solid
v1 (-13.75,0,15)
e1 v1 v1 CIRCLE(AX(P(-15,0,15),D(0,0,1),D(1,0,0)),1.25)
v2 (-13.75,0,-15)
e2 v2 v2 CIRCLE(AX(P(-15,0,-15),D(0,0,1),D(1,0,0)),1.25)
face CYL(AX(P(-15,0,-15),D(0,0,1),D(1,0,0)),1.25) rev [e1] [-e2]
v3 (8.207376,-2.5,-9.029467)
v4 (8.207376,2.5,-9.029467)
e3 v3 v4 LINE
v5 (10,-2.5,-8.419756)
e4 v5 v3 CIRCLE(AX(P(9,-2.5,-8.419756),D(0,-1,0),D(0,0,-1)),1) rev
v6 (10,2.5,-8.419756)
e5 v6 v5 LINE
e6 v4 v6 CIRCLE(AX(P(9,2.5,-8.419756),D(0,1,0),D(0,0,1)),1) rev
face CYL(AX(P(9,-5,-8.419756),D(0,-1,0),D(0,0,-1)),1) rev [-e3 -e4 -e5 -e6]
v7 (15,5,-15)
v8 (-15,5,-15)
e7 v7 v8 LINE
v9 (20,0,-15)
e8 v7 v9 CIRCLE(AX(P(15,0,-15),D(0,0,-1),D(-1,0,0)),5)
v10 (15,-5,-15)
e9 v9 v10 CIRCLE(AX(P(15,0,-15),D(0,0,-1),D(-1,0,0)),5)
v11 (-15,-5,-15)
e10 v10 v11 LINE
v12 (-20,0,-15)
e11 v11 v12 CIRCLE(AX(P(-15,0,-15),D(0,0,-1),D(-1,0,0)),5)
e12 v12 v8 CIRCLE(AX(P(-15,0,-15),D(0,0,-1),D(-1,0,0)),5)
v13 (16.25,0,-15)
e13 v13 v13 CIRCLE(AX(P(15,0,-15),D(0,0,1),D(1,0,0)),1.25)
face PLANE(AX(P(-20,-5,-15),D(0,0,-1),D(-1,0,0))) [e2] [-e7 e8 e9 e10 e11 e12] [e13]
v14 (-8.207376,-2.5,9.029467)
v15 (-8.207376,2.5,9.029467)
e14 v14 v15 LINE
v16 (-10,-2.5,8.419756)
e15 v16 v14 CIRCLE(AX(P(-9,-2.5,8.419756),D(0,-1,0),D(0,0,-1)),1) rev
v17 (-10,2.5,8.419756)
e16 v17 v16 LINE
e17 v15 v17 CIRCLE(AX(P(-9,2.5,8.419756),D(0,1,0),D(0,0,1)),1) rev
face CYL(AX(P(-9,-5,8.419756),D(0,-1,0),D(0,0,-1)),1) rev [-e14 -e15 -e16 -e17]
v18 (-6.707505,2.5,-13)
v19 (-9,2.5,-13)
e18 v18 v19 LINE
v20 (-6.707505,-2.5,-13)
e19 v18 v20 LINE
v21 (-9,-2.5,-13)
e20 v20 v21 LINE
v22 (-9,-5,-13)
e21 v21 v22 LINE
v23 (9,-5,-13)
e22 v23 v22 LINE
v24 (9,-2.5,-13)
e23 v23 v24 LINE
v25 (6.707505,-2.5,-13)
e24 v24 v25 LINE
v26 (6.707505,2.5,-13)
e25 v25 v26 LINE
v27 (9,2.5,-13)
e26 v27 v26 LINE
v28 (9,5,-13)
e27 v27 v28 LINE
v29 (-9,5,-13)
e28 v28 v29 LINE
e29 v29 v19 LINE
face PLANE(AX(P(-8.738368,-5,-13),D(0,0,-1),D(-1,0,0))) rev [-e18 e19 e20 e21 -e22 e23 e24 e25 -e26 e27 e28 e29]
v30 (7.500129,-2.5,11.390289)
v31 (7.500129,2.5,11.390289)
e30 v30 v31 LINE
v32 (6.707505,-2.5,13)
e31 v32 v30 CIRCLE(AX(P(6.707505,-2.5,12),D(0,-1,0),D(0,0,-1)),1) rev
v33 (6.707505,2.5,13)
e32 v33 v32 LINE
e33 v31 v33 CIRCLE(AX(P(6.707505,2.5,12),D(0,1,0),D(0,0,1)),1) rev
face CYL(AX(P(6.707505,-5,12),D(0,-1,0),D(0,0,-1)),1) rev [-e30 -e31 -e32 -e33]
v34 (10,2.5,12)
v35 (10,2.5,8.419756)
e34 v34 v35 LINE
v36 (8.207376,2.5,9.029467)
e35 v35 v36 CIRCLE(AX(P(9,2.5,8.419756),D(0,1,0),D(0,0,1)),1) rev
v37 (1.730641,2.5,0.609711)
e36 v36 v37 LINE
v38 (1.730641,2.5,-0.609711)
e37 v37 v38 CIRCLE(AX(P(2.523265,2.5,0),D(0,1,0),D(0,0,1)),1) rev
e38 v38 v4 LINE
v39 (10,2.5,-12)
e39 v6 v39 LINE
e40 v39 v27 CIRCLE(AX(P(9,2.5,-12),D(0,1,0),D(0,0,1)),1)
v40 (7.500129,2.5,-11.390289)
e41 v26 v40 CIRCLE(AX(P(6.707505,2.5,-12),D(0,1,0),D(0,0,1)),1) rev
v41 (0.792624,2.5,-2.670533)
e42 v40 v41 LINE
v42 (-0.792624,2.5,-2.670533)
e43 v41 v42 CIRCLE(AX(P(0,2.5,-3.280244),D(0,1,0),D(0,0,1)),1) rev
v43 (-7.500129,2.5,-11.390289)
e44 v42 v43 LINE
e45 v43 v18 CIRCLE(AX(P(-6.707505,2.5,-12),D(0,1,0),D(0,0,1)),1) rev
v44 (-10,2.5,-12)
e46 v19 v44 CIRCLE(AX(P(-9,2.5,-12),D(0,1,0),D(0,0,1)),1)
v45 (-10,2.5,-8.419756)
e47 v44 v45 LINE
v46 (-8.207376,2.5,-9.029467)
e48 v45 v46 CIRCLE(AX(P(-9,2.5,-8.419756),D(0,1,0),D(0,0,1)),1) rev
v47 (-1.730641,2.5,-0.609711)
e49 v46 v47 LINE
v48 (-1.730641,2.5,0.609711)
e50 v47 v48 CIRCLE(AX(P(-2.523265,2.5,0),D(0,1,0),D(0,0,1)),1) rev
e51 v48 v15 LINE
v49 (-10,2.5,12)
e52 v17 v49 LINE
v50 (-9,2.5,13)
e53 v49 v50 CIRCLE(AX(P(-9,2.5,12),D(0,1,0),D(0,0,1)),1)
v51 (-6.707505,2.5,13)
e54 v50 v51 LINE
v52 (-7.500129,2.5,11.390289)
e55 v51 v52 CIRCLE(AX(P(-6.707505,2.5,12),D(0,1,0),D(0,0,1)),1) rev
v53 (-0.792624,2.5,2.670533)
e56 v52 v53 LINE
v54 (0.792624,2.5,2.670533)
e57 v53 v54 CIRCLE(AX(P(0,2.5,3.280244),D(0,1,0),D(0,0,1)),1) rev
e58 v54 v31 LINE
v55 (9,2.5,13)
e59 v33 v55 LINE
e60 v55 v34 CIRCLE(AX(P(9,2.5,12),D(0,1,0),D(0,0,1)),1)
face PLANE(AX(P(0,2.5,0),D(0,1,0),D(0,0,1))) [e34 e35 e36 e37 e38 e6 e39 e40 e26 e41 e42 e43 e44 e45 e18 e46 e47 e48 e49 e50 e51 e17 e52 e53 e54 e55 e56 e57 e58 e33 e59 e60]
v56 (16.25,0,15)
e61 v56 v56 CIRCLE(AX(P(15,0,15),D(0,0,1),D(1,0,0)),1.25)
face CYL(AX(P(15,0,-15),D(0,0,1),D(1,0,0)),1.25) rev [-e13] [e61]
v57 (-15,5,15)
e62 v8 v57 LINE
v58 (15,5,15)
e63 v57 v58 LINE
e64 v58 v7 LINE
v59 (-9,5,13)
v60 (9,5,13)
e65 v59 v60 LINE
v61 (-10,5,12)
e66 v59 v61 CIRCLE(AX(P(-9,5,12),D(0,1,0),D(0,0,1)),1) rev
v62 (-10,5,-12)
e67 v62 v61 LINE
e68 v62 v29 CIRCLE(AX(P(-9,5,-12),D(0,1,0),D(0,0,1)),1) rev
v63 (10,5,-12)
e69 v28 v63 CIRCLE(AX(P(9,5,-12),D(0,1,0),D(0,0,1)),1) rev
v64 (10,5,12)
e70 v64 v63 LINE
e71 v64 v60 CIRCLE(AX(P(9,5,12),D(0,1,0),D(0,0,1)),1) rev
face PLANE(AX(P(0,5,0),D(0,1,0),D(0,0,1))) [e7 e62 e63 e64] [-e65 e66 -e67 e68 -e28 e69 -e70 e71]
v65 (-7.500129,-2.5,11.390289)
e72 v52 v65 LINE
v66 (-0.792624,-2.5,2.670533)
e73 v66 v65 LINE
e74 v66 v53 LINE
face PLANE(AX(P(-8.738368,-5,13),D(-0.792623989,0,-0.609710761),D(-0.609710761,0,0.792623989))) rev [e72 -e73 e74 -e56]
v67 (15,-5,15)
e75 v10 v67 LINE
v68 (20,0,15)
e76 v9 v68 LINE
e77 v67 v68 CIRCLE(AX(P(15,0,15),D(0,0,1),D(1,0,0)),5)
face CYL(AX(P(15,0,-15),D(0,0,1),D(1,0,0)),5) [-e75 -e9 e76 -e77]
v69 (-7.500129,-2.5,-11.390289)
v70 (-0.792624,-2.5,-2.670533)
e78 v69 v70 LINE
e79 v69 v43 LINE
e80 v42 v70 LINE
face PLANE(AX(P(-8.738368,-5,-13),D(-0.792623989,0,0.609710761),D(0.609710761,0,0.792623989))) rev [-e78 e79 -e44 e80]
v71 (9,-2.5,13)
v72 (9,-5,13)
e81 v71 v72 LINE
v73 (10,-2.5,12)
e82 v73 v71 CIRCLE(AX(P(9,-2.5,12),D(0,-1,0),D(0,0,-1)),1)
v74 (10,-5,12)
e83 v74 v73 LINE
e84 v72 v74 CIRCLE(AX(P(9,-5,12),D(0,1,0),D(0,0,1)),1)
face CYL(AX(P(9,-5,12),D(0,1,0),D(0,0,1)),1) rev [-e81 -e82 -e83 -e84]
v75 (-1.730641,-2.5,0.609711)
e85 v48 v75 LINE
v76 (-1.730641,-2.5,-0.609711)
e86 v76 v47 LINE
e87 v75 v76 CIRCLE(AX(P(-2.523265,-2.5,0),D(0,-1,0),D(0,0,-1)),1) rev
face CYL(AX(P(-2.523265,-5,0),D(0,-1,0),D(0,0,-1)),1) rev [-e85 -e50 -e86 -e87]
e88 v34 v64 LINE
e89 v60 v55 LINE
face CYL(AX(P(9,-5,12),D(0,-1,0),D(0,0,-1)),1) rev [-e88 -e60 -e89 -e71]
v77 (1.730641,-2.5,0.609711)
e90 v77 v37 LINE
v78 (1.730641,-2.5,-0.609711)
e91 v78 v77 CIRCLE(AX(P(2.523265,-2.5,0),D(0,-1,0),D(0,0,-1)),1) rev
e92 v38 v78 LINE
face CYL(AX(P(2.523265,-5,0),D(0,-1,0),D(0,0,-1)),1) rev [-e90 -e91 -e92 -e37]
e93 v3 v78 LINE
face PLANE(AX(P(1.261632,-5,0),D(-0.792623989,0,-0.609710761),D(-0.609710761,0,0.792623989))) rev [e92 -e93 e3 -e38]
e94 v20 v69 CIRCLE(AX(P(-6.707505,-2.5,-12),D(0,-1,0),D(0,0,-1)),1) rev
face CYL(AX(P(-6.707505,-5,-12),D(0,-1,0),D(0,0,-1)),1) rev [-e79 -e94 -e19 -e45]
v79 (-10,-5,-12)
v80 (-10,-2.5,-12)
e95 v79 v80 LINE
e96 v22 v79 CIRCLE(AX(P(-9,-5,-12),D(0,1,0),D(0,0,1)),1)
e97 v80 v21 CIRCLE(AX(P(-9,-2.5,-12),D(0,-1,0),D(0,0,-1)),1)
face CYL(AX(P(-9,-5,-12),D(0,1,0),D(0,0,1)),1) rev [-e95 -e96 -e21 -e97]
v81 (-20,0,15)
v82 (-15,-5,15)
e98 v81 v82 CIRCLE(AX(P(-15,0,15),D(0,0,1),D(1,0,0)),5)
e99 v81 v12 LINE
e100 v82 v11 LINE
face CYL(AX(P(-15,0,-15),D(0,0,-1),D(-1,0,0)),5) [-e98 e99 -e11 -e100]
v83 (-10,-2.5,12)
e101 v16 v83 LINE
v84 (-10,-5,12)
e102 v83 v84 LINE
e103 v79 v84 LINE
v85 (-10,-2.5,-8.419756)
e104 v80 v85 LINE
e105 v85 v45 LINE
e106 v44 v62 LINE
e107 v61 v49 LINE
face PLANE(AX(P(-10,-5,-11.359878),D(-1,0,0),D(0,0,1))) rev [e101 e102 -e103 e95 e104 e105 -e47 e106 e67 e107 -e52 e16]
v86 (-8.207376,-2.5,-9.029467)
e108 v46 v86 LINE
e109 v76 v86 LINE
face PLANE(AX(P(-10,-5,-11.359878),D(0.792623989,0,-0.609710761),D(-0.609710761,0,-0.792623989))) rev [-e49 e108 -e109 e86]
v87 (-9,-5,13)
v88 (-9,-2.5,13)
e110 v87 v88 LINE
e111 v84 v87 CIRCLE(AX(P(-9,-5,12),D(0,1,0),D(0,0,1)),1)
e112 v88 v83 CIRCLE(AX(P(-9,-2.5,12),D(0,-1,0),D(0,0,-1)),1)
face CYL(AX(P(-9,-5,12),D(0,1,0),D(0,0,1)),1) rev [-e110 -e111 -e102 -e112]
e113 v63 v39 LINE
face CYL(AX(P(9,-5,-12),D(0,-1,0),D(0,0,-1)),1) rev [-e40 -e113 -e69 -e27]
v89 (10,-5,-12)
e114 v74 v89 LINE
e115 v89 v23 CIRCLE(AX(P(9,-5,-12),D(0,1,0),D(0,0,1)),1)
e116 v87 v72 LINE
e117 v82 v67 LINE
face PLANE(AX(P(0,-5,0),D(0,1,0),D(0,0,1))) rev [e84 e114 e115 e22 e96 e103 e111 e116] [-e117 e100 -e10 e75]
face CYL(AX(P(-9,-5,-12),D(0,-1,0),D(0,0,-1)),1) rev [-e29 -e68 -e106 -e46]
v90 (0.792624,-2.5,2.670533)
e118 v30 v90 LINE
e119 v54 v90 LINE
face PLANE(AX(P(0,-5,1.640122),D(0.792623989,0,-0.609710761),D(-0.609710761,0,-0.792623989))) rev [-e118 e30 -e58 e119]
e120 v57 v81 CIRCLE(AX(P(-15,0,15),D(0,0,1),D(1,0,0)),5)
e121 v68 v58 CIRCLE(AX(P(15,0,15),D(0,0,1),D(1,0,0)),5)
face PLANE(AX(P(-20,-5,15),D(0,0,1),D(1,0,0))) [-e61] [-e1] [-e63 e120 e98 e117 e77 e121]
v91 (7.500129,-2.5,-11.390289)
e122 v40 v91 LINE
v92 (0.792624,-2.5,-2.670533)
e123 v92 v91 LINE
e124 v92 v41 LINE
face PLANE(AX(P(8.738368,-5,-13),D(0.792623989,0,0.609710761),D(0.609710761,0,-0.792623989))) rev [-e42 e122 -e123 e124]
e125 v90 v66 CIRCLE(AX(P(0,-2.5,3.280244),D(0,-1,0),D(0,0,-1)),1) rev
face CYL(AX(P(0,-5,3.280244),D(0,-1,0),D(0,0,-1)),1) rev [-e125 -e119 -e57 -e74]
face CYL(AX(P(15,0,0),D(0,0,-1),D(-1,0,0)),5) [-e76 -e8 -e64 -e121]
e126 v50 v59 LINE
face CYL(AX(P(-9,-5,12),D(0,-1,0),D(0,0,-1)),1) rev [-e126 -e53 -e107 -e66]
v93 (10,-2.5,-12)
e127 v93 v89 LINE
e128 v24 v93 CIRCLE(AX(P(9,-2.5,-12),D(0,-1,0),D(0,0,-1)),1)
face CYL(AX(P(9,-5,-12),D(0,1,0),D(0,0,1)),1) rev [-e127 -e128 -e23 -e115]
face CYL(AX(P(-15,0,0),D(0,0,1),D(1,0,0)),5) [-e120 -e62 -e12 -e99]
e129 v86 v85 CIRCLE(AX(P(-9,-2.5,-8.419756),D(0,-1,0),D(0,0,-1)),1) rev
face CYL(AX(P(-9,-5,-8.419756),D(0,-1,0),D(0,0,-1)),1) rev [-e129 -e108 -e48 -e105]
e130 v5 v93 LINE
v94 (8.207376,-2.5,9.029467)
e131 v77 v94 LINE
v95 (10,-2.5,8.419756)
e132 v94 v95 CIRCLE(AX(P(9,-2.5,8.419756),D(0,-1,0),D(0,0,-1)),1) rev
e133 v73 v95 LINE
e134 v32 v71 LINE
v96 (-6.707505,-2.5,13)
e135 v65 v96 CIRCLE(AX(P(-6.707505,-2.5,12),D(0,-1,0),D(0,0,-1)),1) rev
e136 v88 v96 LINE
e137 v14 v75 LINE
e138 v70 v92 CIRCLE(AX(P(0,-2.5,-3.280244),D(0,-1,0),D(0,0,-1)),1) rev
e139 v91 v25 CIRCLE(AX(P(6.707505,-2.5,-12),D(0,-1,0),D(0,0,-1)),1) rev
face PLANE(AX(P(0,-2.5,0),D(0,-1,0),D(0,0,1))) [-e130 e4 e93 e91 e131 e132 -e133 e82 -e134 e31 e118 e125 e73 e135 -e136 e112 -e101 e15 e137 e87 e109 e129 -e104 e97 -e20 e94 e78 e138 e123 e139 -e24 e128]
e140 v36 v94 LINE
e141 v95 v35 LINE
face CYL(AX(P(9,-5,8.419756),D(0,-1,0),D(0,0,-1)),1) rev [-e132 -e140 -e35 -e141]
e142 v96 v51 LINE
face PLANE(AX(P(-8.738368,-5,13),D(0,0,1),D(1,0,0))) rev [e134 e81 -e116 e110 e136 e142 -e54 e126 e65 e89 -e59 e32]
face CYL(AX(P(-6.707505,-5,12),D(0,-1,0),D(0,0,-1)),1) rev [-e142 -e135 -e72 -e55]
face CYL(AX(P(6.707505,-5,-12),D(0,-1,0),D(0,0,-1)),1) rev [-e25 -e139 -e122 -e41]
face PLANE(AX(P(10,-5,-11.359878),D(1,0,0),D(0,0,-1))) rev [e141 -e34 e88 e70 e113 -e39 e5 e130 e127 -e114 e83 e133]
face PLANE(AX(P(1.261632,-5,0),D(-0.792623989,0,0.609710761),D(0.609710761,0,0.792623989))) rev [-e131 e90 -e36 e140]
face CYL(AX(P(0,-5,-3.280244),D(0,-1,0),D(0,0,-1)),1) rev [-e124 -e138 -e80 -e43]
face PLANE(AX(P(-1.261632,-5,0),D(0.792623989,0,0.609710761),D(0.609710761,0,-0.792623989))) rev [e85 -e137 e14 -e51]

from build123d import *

# Parameters (mm, degrees)
EXTRUDE_425_DEPTH      = 5
EXTRUDE_425_DEPTH_BACK = 5
SKETCH_1_W             = 40
SKETCH_1_H             = 30
SKETCH_5_R             = 1.25
CUT_EXTRUDE_679_DEPTH  = 37.400549446
CUT_EXTRUDE_1219_DEPTH = 27.925824036
SKETCH_7_W             = 20
SKETCH_7_H             = 26
CUT_EXTRUDE_1457_DEPTH = 2.5
FILLET_1_R             = 1
FILLET_2_R             = 1
FILLET_3_R             = 5


with BuildPart() as part:
    # Эскиз1 → Extrude 425 (new, two sides: drawn at the far end of the back side and taken through both)
    with BuildSketch(Plane(origin=(0, 0, 0), x_dir=(1, 0, 0), z_dir=(0, 1, 0)).offset(-EXTRUDE_425_DEPTH_BACK)):
        Rectangle(SKETCH_1_W, SKETCH_1_H)
    extrude(amount=EXTRUDE_425_DEPTH + EXTRUDE_425_DEPTH_BACK)

    # Эскиз5 → Cut-Extrude 679 (cut, through all)
    with BuildSketch(Plane.XY.offset(15)):
        with Locations((-15, 0)):
            Circle(SKETCH_5_R)
        with Locations((15, 0)):
            Circle(SKETCH_5_R)
    extrude(amount=-CUT_EXTRUDE_679_DEPTH, mode=Mode.SUBTRACT)

    # Эскиз6 → Cut-Extrude 1219 (cut, through all)
    with BuildSketch(Plane(origin=(0, 5, 0), x_dir=(1, 0, 0), z_dir=(0, 1, 0))):
        Polygon((-8.738367733, 13), (8.738367733, 13), (0, 1.640121947), align=None)
        Polygon((10, 11.359878053), (10, -11.359878053), (1.261632267, 0), align=None)
        Polygon((-8.738367733, -13), (8.738367733, -13), (0, -1.640121947), align=None)
        Polygon((-10, 11.359878053), (-10, -11.359878053), (-1.261632267, 0), align=None)
    extrude(amount=-CUT_EXTRUDE_1219_DEPTH, mode=Mode.SUBTRACT)

    # Эскиз7 → Cut-Extrude 1457 (cut)
    with BuildSketch(Plane(origin=(0, 5, 0), x_dir=(1, 0, 0), z_dir=(0, 1, 0))):
        Rectangle(SKETCH_7_W, SKETCH_7_H)
    cut_extrude_1457 = extrude(amount=-CUT_EXTRUDE_1457_DEPTH, mode=Mode.SUBTRACT)

    # Зеркальное отражение1: Cut-Extrude 1457 across plane
    add(cut_extrude_1457.mirror(Plane.ZX), mode=Mode.SUBTRACT)

    # Скругление1
    fillet_1_edges = [part.edges().sort_by_distance(p)[0] for p in [
        (8.738367733, 0, 13),
        (-8.738367733, 0, 13),
        (-10, 0, 11.359878053),
        (-10, 0, -11.359878053),
        (-8.738367733, 0, -13),
        (8.738367733, 0, -13),
        (10, 0, -11.359878053),
        (10, 0, 11.359878053),
        (-10, -3.75, -13),
        (-10, -3.75, 13),
        (10, -3.75, 13),
        (10, -3.75, -13),
        (10, 3.75, -13),
        (-10, 3.75, -13),
        (-10, 3.75, 13),
        (10, 3.75, 13),
    ]]
    fillet(fillet_1_edges, radius=FILLET_1_R)

    # Скругление2
    fillet_2_edges = [part.edges().sort_by_distance(p)[0] for p in [
        (0, 0, 1.640121947),
        (-1.261632267, 0, 0),
        (0, 0, -1.640121947),
        (1.261632267, 0, 0),
    ]]
    fillet(fillet_2_edges, radius=FILLET_2_R)

    # Скругление3
    fillet_3_edges = [part.edges().sort_by_distance(p)[0] for p in [
        (-20, -5, 0),
        (-20, 5, 0),
        (20, -5, 0),
        (20, 5, 0),
    ]]
    fillet(fillet_3_edges, radius=FILLET_3_R - 0.0001)  # a hair under: the kernel refuses the full size


solid = part.part
